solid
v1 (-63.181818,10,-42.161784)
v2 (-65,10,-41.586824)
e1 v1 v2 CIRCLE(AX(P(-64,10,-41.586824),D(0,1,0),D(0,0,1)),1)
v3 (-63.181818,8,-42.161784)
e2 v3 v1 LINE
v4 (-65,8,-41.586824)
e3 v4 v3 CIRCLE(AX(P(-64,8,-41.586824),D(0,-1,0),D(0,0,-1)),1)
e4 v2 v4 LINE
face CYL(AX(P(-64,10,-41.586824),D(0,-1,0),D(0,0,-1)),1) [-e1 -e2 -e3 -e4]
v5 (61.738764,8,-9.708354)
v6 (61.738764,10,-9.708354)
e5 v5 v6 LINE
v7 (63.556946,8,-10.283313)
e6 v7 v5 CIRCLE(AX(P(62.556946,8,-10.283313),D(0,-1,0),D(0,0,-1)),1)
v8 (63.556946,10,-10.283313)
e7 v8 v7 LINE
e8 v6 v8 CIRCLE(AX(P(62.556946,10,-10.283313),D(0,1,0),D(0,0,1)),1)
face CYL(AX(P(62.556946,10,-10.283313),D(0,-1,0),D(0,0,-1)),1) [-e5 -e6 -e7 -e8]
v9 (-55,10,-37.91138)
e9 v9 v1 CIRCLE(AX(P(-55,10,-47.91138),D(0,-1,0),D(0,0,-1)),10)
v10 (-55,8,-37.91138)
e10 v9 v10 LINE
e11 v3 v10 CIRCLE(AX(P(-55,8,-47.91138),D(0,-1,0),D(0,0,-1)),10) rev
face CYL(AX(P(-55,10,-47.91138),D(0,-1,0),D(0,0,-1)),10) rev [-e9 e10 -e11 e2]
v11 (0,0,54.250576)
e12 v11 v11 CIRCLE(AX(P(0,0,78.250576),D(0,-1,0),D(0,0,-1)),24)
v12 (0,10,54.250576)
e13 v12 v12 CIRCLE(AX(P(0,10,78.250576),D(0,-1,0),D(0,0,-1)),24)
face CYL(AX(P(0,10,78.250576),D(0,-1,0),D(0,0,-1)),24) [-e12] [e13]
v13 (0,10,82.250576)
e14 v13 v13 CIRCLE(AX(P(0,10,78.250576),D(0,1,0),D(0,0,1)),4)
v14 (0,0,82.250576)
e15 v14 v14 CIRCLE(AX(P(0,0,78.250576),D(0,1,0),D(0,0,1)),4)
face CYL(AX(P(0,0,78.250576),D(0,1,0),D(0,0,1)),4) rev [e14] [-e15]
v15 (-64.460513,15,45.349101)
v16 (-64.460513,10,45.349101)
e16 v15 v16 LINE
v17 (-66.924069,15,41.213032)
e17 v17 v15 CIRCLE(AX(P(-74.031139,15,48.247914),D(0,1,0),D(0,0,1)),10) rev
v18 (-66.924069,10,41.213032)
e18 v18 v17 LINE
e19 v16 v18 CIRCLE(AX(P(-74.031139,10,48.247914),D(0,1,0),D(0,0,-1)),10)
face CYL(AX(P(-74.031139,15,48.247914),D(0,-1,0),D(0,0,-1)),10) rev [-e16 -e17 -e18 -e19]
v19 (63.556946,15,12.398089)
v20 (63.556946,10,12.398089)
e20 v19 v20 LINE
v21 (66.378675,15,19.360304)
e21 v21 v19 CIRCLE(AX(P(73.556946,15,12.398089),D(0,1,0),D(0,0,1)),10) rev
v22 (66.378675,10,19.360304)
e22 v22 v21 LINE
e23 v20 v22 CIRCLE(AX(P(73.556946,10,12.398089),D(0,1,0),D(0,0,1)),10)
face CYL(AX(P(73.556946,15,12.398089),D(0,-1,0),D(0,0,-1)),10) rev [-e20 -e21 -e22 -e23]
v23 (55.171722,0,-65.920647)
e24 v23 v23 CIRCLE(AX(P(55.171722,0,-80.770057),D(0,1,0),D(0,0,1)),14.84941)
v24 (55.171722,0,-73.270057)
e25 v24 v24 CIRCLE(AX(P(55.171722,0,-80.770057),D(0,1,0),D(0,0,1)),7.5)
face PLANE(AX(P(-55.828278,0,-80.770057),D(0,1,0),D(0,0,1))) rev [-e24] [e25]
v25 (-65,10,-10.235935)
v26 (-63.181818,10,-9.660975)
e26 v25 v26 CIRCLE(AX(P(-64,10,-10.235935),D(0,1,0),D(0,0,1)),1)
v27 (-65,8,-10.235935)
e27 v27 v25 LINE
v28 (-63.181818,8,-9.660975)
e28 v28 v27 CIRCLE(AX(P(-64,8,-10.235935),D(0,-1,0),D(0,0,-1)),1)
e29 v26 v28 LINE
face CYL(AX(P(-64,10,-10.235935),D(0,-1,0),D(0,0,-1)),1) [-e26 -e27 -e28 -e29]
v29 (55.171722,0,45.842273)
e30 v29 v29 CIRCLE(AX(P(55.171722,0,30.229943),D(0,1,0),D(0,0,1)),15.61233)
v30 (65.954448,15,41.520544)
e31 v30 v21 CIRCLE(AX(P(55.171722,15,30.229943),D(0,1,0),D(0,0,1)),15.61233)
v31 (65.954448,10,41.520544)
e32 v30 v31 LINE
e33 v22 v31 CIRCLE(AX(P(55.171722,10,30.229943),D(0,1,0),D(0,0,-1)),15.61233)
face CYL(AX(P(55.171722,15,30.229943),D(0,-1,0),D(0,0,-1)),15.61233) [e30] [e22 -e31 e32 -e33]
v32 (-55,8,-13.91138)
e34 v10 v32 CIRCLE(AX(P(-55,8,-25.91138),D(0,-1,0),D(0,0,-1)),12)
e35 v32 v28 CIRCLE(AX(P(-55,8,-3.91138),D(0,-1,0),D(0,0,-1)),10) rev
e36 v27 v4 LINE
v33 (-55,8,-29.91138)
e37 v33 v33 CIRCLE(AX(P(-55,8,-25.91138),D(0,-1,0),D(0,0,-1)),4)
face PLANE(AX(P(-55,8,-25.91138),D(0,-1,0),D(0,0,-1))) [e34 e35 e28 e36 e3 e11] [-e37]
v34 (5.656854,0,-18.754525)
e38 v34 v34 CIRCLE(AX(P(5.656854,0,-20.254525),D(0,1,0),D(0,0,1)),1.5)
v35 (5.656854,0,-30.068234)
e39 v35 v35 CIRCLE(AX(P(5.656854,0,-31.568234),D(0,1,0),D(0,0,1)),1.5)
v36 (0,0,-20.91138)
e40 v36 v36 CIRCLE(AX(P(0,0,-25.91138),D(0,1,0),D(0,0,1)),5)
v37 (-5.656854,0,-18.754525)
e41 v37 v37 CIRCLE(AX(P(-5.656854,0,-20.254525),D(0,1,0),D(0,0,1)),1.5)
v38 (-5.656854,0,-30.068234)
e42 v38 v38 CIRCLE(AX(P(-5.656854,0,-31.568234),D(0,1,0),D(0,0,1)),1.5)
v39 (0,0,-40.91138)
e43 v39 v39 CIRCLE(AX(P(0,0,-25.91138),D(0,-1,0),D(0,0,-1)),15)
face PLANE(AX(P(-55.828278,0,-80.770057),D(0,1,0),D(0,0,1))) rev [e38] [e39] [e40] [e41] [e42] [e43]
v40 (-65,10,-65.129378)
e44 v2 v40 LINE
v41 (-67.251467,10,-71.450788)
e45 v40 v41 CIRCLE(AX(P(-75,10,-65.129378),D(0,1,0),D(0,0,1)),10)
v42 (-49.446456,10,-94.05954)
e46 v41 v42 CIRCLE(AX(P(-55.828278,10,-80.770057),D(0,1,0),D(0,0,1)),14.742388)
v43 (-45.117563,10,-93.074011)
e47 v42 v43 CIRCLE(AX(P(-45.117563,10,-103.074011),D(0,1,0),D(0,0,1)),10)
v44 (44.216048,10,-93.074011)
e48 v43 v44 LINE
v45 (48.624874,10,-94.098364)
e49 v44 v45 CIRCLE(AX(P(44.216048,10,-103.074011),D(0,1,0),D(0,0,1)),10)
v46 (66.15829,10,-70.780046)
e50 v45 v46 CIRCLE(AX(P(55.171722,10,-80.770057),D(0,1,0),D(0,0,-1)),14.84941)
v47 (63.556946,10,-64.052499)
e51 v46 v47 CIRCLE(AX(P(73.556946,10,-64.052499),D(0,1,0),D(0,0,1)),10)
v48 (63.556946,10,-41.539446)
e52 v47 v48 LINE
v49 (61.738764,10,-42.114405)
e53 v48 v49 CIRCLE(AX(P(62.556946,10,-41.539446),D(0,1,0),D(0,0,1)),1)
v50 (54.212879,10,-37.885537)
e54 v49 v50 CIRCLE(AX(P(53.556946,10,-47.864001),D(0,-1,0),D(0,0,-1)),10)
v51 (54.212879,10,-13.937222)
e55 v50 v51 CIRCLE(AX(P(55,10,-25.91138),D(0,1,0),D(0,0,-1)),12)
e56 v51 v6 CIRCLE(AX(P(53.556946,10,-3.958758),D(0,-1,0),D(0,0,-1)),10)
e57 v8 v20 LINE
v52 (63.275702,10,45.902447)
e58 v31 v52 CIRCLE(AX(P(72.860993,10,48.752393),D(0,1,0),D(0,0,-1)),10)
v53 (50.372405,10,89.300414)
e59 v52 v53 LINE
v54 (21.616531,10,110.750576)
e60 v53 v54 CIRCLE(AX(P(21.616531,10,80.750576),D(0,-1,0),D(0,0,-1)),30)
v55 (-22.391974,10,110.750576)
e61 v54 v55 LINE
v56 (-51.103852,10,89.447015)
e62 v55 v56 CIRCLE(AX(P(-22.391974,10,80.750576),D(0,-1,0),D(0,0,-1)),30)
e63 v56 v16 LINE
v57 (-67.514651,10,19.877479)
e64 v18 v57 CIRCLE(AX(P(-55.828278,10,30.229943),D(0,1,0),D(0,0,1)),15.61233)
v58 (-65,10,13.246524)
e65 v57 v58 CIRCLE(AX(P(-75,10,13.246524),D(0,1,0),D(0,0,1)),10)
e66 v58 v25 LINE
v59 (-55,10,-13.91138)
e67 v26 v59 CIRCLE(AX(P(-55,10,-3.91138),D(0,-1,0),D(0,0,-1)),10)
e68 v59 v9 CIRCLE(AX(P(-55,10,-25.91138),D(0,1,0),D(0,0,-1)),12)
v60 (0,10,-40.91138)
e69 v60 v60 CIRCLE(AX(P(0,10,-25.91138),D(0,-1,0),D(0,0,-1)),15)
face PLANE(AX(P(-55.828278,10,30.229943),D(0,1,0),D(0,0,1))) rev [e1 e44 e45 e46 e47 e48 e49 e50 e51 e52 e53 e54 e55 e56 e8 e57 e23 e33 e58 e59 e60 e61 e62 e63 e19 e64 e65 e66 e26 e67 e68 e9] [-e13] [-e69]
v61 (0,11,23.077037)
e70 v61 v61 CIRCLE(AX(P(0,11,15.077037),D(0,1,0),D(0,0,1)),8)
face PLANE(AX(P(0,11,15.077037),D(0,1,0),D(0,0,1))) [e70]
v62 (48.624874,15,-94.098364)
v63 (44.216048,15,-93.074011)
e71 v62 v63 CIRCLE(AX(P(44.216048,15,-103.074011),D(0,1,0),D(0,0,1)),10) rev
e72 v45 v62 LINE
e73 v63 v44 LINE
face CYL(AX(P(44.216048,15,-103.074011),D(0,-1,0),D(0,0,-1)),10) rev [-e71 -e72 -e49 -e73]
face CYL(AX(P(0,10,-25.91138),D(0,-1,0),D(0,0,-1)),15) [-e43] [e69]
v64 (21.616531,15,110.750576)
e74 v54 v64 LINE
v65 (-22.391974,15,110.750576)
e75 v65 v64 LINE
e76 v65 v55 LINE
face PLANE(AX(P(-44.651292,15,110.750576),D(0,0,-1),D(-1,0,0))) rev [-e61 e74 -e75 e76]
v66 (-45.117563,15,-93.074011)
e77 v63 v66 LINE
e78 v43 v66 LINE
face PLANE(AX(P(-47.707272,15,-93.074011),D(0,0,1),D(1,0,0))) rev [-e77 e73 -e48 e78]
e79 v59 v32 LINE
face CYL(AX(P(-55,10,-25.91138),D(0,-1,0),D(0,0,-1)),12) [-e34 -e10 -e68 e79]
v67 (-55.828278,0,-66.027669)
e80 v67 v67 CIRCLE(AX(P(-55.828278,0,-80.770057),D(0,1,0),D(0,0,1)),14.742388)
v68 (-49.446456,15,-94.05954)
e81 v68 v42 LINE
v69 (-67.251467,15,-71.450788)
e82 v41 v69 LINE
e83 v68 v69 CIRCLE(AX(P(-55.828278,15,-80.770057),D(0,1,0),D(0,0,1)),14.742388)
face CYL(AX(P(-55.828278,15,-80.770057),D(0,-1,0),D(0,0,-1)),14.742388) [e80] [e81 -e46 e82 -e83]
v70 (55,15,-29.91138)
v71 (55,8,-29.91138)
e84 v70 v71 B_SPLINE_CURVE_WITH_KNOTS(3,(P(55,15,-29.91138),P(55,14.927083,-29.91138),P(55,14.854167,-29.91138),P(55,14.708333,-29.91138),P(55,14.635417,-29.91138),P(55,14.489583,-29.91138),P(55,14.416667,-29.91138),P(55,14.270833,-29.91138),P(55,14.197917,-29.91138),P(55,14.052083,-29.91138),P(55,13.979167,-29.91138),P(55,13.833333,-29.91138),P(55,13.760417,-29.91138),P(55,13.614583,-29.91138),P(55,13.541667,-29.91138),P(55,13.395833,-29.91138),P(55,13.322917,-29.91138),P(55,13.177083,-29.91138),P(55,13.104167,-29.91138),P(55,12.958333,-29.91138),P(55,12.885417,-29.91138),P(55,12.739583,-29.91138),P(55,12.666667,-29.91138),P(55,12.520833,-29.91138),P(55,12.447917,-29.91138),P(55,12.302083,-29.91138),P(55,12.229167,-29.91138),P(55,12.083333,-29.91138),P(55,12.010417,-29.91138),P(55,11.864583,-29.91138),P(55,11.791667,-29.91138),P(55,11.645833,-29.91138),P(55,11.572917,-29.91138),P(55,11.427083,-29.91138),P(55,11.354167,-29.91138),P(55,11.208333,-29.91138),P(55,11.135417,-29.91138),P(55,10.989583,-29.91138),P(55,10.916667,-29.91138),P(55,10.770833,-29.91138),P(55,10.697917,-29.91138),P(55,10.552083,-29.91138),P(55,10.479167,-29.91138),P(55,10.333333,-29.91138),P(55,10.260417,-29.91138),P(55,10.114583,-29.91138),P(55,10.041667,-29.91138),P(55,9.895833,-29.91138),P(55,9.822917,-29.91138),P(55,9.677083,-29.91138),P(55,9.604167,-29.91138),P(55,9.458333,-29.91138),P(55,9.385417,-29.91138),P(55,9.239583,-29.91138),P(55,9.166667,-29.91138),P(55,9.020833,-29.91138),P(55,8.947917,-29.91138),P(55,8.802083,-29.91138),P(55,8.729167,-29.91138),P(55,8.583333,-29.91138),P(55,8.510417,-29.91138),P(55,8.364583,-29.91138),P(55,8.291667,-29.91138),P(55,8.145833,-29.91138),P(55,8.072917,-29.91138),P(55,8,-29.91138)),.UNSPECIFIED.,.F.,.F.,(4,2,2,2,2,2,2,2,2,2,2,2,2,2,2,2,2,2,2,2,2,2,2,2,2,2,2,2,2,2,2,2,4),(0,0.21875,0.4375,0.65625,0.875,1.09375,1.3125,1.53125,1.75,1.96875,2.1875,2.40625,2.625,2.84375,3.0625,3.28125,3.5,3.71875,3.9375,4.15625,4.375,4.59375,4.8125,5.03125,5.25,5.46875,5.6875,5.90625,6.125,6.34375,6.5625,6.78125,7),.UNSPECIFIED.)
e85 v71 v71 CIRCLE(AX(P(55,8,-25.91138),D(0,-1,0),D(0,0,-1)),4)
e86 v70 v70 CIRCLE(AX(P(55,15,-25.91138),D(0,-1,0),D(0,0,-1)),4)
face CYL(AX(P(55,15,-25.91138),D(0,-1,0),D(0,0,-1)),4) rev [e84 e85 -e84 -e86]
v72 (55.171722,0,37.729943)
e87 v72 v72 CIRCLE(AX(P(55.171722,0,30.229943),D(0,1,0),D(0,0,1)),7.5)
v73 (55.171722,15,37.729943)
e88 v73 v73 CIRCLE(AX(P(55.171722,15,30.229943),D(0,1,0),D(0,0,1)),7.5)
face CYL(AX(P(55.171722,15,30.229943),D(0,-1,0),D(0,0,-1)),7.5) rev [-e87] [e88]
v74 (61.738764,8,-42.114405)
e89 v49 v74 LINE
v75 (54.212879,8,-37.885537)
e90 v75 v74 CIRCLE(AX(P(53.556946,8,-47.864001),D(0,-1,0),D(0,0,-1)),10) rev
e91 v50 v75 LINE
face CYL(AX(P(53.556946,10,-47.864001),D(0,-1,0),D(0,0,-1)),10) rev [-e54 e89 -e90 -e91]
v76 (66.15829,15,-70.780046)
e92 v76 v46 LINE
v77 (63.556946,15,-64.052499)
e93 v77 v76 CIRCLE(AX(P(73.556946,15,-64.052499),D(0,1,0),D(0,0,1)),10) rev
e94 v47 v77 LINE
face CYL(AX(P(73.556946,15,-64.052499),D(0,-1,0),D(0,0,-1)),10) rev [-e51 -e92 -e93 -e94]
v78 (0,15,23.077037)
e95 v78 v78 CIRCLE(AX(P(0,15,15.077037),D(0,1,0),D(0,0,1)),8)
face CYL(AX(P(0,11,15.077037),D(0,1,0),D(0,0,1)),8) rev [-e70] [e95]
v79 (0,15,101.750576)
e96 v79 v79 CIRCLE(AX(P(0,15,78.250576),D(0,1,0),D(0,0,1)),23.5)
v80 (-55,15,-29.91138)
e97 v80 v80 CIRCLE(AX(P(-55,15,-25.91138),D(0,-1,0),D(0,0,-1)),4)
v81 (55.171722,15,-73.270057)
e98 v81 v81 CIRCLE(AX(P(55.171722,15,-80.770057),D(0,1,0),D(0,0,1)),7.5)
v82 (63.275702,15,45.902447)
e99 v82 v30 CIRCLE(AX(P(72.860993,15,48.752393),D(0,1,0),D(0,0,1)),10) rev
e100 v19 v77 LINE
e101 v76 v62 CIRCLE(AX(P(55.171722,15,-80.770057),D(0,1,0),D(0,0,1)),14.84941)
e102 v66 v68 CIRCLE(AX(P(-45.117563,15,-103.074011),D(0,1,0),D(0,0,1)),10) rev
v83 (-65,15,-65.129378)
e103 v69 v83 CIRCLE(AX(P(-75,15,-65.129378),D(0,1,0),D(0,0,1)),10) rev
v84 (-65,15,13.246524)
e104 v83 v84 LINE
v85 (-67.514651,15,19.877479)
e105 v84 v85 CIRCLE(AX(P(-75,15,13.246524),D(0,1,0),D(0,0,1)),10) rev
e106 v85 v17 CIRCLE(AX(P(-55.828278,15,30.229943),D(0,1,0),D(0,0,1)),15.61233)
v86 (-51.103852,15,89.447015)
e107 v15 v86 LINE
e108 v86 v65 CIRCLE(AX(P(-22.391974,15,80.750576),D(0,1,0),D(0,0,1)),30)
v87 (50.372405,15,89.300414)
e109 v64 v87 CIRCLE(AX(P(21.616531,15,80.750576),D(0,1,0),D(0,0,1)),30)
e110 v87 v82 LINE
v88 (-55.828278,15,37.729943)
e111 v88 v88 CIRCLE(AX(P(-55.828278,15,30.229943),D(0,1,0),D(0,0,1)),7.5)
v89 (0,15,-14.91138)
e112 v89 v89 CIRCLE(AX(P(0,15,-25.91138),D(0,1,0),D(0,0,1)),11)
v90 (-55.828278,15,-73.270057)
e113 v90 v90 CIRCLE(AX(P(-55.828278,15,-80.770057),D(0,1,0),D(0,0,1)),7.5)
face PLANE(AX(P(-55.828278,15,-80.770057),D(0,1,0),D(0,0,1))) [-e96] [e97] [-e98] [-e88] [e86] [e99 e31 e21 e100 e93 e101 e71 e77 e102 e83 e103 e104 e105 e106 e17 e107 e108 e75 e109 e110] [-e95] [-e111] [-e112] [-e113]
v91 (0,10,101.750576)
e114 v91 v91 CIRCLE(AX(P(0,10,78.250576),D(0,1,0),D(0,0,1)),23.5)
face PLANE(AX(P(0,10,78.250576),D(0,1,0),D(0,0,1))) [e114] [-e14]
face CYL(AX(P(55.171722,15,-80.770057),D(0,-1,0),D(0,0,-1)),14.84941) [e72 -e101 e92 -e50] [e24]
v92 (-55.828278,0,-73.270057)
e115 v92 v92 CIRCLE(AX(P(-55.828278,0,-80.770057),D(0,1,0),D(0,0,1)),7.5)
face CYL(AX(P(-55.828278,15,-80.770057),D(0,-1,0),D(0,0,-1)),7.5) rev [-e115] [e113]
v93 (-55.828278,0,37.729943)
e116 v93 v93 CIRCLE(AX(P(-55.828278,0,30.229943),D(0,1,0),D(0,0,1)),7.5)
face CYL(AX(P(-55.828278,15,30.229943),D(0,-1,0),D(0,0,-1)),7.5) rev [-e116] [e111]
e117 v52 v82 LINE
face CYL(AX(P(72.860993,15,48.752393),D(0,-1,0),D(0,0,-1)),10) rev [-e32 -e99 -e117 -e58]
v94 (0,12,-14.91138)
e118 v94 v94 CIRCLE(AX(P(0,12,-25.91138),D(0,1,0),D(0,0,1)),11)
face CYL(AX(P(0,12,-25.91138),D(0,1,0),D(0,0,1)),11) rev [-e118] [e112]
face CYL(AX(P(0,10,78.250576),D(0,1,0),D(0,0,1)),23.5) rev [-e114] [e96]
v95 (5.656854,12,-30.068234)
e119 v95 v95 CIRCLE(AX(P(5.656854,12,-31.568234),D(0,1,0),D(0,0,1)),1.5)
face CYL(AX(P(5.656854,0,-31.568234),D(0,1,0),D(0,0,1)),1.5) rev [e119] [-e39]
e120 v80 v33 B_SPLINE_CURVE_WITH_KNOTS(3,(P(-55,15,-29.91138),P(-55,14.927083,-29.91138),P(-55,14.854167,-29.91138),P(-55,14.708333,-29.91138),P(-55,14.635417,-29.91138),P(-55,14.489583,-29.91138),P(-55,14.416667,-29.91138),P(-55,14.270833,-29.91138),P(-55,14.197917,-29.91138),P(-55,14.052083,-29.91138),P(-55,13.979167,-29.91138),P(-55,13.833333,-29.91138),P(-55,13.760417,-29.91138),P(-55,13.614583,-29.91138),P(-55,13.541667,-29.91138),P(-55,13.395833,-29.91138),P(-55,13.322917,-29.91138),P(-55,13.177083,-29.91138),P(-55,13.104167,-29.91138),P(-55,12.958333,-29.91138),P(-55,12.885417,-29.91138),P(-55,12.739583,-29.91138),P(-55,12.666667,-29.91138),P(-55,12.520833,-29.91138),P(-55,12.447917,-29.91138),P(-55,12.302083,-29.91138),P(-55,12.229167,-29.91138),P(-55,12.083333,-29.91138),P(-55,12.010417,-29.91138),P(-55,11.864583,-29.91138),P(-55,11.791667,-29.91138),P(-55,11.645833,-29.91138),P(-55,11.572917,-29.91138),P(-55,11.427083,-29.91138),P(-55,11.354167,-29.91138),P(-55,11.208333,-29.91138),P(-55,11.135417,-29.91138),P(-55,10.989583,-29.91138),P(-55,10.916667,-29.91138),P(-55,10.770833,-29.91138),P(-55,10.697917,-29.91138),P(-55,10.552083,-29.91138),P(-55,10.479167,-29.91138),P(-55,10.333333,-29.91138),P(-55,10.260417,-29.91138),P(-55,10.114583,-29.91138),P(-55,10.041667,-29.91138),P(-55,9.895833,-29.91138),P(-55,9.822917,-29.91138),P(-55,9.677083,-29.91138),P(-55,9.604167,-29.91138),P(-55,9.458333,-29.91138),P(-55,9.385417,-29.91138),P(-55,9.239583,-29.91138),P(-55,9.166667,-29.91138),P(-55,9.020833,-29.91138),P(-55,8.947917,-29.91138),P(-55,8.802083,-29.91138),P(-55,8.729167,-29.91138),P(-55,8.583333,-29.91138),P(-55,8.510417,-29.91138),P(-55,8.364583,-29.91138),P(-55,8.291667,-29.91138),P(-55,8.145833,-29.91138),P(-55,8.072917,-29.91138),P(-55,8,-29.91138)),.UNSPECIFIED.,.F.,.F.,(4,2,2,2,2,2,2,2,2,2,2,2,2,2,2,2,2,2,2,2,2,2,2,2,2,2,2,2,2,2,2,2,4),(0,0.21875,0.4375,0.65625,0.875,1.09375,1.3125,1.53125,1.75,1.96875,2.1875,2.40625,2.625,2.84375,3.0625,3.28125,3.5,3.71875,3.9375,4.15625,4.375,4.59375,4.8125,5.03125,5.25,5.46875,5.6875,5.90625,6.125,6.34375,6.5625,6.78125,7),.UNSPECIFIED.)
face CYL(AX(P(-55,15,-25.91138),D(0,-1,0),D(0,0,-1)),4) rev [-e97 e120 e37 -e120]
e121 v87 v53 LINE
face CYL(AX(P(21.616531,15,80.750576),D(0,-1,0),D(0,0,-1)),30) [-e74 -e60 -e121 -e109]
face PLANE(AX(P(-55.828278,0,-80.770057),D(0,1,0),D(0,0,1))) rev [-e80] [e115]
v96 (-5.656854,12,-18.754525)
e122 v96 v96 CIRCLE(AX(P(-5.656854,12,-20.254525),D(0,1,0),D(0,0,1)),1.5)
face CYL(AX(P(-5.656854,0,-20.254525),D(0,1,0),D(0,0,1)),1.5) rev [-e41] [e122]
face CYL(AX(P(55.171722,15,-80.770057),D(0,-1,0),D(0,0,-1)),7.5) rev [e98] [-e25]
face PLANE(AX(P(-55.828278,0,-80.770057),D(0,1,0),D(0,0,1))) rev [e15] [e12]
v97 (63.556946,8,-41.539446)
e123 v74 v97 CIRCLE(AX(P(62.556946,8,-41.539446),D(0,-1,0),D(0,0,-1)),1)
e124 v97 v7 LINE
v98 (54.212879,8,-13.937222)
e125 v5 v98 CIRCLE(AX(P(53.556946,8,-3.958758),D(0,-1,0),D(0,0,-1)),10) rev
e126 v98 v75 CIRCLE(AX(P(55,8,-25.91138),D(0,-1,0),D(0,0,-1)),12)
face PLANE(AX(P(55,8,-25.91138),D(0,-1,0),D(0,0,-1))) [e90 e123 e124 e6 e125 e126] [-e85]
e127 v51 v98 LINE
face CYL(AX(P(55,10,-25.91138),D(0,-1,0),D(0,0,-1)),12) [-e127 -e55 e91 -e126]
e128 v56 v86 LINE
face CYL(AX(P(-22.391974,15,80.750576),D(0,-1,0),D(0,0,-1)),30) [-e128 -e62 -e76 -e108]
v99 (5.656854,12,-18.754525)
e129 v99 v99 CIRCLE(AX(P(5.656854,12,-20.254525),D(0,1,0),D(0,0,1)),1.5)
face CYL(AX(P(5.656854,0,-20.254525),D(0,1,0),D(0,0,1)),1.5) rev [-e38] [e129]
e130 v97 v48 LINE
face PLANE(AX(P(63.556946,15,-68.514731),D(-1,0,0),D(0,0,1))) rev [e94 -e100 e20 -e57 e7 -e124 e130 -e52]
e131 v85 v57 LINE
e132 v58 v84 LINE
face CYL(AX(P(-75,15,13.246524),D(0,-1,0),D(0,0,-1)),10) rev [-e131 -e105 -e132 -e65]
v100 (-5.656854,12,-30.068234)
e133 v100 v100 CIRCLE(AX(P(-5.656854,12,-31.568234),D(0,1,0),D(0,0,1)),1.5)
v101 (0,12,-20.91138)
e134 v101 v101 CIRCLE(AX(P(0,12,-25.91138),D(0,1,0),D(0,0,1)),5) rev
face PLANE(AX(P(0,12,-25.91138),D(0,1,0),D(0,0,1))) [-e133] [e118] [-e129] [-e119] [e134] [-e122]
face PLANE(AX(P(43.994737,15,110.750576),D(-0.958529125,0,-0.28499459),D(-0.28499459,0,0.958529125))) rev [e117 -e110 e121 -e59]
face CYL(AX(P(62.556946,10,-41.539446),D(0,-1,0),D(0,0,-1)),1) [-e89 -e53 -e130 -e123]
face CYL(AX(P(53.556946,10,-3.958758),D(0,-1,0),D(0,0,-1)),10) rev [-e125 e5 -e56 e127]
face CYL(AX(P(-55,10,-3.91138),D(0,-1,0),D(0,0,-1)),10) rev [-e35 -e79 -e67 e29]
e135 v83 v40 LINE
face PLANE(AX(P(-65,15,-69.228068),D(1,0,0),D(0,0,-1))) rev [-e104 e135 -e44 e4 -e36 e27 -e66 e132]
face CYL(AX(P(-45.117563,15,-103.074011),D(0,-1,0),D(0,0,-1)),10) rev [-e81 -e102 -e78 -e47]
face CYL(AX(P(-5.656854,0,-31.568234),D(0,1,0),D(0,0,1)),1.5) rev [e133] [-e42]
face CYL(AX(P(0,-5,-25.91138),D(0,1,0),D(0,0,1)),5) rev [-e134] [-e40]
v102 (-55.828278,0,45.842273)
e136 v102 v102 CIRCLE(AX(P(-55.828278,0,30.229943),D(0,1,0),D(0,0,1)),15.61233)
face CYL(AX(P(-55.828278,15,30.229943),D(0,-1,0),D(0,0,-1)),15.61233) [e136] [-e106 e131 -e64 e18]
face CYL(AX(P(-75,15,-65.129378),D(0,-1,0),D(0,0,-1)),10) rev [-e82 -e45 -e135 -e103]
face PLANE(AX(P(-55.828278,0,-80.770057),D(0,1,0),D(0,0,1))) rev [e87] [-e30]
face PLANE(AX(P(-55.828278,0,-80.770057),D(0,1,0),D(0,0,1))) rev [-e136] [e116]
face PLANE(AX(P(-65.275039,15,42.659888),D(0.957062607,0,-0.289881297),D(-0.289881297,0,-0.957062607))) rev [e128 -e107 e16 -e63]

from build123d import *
from build123d.topology import SkipClean

# Parameters (mm, degrees)
SKETCH1_R           = 7.5
BOSS_EXTRUDE1_DEPTH = 15
SKETCH4_R           = 5
CUT_EXTRUDE2_DEPTH  = 20
SKETCH5_R           = 11
CUT_EXTRUDE3_DEPTH  = 3
SKETCH6_R           = 1.5
CUT_EXTRUDE4_DEPTH  = 133.338393859
SKETCH7_R           = 8
CUT_EXTRUDE5_DEPTH  = 4
FILLET3_R           = 30
FILLET4_R           = 10
SKETCH9_R           = 23.5
CUT_EXTRUDE6_DEPTH  = 5
SKETCH10_R          = 4
CUT_EXTRUDE7_DEPTH  = 133.172048819
SKETCH11_R          = 12
CUT_EXTRUDE8_DEPTH  = 8
FILLET5_R           = 10
SKETCH12_R          = 4
CUT_EXTRUDE9_DEPTH  = 133.035792455
SKETCH14_R          = 24
SKETCH14_R_2        = 15
CUT_EXTRUDE16_DEPTH = 10
FILLET6_R           = 10
FILLET7_START       = 8
FILLET7_DEPTH       = 2


with BuildPart() as part:
    # Sketch1 → Boss-Extrude1 (new body)
    with BuildSketch(Plane(origin=(0, 0, 0), x_dir=(1, 0, 0), z_dir=(0, 1, 0))):
        with BuildLine():
            Line((-47.707272336, 93.074011467), (46.85801727, 93.074011467))
            ThreePointArc((46.85801727, 93.074011467), (67.451414768, 89.11955675), (63.55694563, 68.514731035))
            Line((63.55694563, 68.514731035), (63.55694563, -17.060551097))
            ThreePointArc((63.55694563, -17.060551097), (70.78018401, -29.882416282), (64.134785378, -43.013070362))
            Line((64.134785378, -43.013070362), (43.994737315, -110.750576059))
            Line((43.994737315, -110.750576059), (-44.651292342, -110.750576059))
            Line((-44.651292342, -110.750576059), (-65.275039181, -42.659888117))
            ThreePointArc((-65.275039181, -42.659888117), (-71.439667546, -30.058632987), (-65, -17.595689691))
            Line((-65, -17.595689691), (-65, 69.228067604))
            ThreePointArc((-65, 69.228067604), (-67.7628182, 89.424810491), (-47.707272336, 93.074011467))
        make_face()
        with Locations(Location((-55.828277514, 80.770057168, 0), (0, 0, 270))):
            Circle(SKETCH1_R, mode=Mode.SUBTRACT)
        with Locations(Location((55.171722486, 80.770057168, 0), (0, 0, 270))):
            Circle(SKETCH1_R, mode=Mode.SUBTRACT)
        with Locations(Location((-55.828277514, -30.229942832, 0), (0, 0, 270))):
            Circle(SKETCH1_R, mode=Mode.SUBTRACT)
        with Locations(Location((55.171722486, -30.229942832, 0), (0, 0, 270))):
            Circle(SKETCH1_R, mode=Mode.SUBTRACT)
    extrude(amount=BOSS_EXTRUDE1_DEPTH)

    # Sketch4 → Cut-Extrude2 (cut)
    with BuildSketch(Plane(origin=(0, 15, 0), x_dir=(1, 0, 0), z_dir=(0, 1, 0))):
        with Locations(Location((0, 25.91137957, 0), (0, 0, 270))):
            Circle(SKETCH4_R)
    extrude(amount=-CUT_EXTRUDE2_DEPTH, mode=Mode.SUBTRACT)

    # Sketch5 → Cut-Extrude3 (cut)
    with BuildSketch(Plane(origin=(0, 15, 0), x_dir=(1, 0, 0), z_dir=(0, 1, 0))):
        with Locations(Location((0, 25.91137957, 0), (0, 0, 270))):
            Circle(SKETCH5_R)
    extrude(amount=-CUT_EXTRUDE3_DEPTH, mode=Mode.SUBTRACT)

    # Sketch6 → Cut-Extrude4 (cut, through all)
    with BuildSketch(Plane(origin=(0, 12, 0), x_dir=(1, 0, 0), z_dir=(0, 1, 0))):
        with Locations(Location((-5.656854249, 31.568233819, 0), (0, 0, 270))):
            Circle(SKETCH6_R)
        with Locations(Location((5.656854249, 31.568233819, 0), (0, 0, 270))):
            Circle(SKETCH6_R)
        with Locations(Location((5.656854249, 20.25452532, 0), (0, 0, 270))):
            Circle(SKETCH6_R)
        with Locations(Location((-5.656854249, 20.25452532, 0), (0, 0, 270))):
            Circle(SKETCH6_R)
    extrude(amount=-CUT_EXTRUDE4_DEPTH, mode=Mode.SUBTRACT)

    # Sketch7 → Cut-Extrude5 (cut)
    with BuildSketch(Plane(origin=(0, 15, 0), x_dir=(1, 0, 0), z_dir=(0, 1, 0))):
        with Locations(Location((0, -15.077036946, 0), (0, 0, 270))):
            Circle(SKETCH7_R)
    extrude(amount=-CUT_EXTRUDE5_DEPTH, mode=Mode.SUBTRACT)

    # Fillet3
    fillet3_edges = [part.edges().sort_by_distance(p)[0] for p in [
        (43.994737315, 7.5, 110.750576059),
        (-44.651292342, 7.5, 110.750576059),
    ]]
    fillet(fillet3_edges, radius=FILLET3_R)

    # Fillet4
    fillet4_edges = [part.edges().sort_by_distance(p)[0] for p in [
        (64.134785378, 7.5, 43.013070362),
        (-65.275039181, 7.5, 42.659888117),
    ]]
    fillet(fillet4_edges, radius=FILLET4_R)

    # Sketch9 → Cut-Extrude6 (cut)
    with BuildSketch(Plane(origin=(0, 15, 0), x_dir=(1, 0, 0), z_dir=(0, 1, 0))):
        with Locations(Location((0, -78.250576059, 0), (0, 0, 270))):
            Circle(SKETCH9_R)
    extrude(amount=-CUT_EXTRUDE6_DEPTH, mode=Mode.SUBTRACT)

    # Sketch10 → Cut-Extrude7 (cut, through all)
    with BuildSketch(Plane(origin=(0, 10, 0), x_dir=(1, 0, 0), z_dir=(0, 1, 0))):
        with Locations(Location((0, -78.250576059, 0), (0, 0, 270))):
            Circle(SKETCH10_R)
    extrude(amount=-CUT_EXTRUDE7_DEPTH, mode=Mode.SUBTRACT)

    # Sketch11 → Cut-Extrude8 (cut)
    with BuildSketch(Plane.XZ):
        with Locations((-55, -25.91137957)):
            Circle(SKETCH11_R)
        with Locations((55, -25.91137957)):
            Circle(SKETCH11_R)
    extrude(amount=-CUT_EXTRUDE8_DEPTH, mode=Mode.SUBTRACT)

    # Fillet5
    fillet5_edges = [part.edges().sort_by_distance(p)[0] for p in [
        (63.55694563, 4, -17.498372885),
        (63.55694563, 4, -34.324386255),
        (-65, 4, -32.544629151),
        (-65, 4, -19.278129989),
    ]]
    fillet(fillet5_edges, radius=FILLET5_R)

    # Sketch12 → Cut-Extrude9 (cut, through all)
    with BuildSketch(Plane.XZ.offset(-8)):
        with Locations(Location((-55, -25.91137957, 0), (0, 0, 270))):
            Circle(SKETCH12_R)
        with Locations(Location((55, -25.91137957, 0), (0, 0, 270))):
            Circle(SKETCH12_R)
    extrude(amount=-CUT_EXTRUDE9_DEPTH, mode=Mode.SUBTRACT)

    # Sketch14 → Cut-Extrude16 (cut)
    with SkipClean():  # the faces are left unmerged after this step: merging them gives an invalid solid
        with BuildSketch(Plane.XZ):
            with BuildLine():
                Line((63.55694563, -3.958757993), (63.55694563, 17.060551097))
                ThreePointArc((63.55694563, 17.060551097), (39.633853338, 31.752922858), (65.954448155, 41.520543922))
                ThreePointArc((65.954448155, 41.520543922), (64.328969033, 43.536593055), (63.275701742, 45.902446917))
                Line((63.275701742, 45.902446917), (50.37240498, 89.300413753))
                ThreePointArc((50.37240498, 89.300413753), (39.553990203, 104.79735475), (21.616531225, 110.750576059))
                Line((21.616531225, 110.750576059), (-22.391974152, 110.750576059))
                ThreePointArc((-22.391974152, 110.750576059), (-40.268031225, 104.843035119), (-51.103852363, 89.447014961))
                Line((-51.103852363, 89.447014961), (-64.46051315, 45.349100617))
                ThreePointArc((-64.46051315, 45.349100617), (-65.439681201, 43.13060481), (-66.9240694, 41.213032024))
                ThreePointArc((-66.9240694, 41.213032024), (-40.267501523, 31.497655875), (-65, 17.595689691))
                Line((-65, 17.595689691), (-65, -3.91137957))
                ThreePointArc((-65, -3.91137957), (-62.071067812, -10.982447382), (-55, -13.91137957))
                ThreePointArc((-55, -13.91137957), (-43, -25.91137957), (-55, -37.91137957))
                ThreePointArc((-55, -37.91137957), (-62.071067812, -40.840311758), (-65, -47.91137957))
                Line((-65, -47.91137957), (-65, -69.228067604))
                ThreePointArc((-65, -69.228067604), (-43.893736828, -72.115303846), (-47.707272336, -93.074011467))
                Line((-47.707272336, -93.074011467), (46.85801727, -93.074011467))
                ThreePointArc((46.85801727, -93.074011467), (42.892030205, -72.420557586), (63.55694563, -68.514731035))
                Line((63.55694563, -68.514731035), (63.55694563, -47.864001147))
                ThreePointArc((63.55694563, -47.864001147), (60.856237995, -41.028773939), (54.212879435, -37.885536794))
                ThreePointArc((54.212879435, -37.885536794), (43, -25.91137957), (54.212879435, -13.937222346))
                ThreePointArc((54.212879435, -13.937222346), (60.856237995, -10.793985201), (63.55694563, -3.958757993))
            make_face()
            with Locations(Location((0, 78.250576059, 0), (0, 0, 270))):
                Circle(SKETCH14_R, mode=Mode.SUBTRACT)
            with Locations(Location((0, -25.91137957, 0), (0, 0, 270))):
                Circle(SKETCH14_R_2, mode=Mode.SUBTRACT)
        extrude(amount=-CUT_EXTRUDE16_DEPTH, mode=Mode.SUBTRACT)

    # Fillet6
    fillet6_edges = [part.edges().sort_by_distance(p)[0] for p in [
        (-47.707272336, 12.5, -93.074011467),
        (46.85801727, 12.5, -93.074011467),
        (63.55694563, 12.5, -68.514731035),
        (63.55694563, 12.5, 17.060551097),
        (-65, 12.5, 17.595689691),
        (-65, 12.5, -69.228067604),
    ]]
    fillet(fillet6_edges, radius=FILLET6_R)

    # Fillet7: read off the stored shape, not the designer's step
    # Fillet7 outline → Fillet7 (cut)
    with SkipClean():  # the faces are left unmerged after this step: merging them gives an invalid solid
        with BuildSketch(Plane(origin=(0, 0, 0), x_dir=(1, 0, 0), z_dir=(0, 1, 0)).offset(FILLET7_START)):
            with BuildLine():
                ThreePointArc((-65, 3.91137957), (-64.534625893, 6.926493016), (-63.181818182, 9.660975316))
                ThreePointArc((-63.181818182, 9.660975316), (-64.301511345, 9.282472301), (-65, 10.23593489))
                Line((-65, 10.23593489), (-65, 3.91137957))
            make_face()
            with BuildLine():
                Line((-65, 47.91137957), (-65, 41.58682425))
                ThreePointArc((-65, 41.58682425), (-64.301511345, 42.540286839), (-63.181818182, 42.161783824))
                ThreePointArc((-63.181818182, 42.161783824), (-64.534625893, 44.896266124), (-65, 47.91137957))
            make_face()
            with BuildLine():
                ThreePointArc((63.55694563, 47.864001147), (63.091571523, 44.848887701), (61.738763812, 42.114405401))
                ThreePointArc((61.738763812, 42.114405401), (62.858456975, 42.492908415), (63.55694563, 41.539445826))
                Line((63.55694563, 41.539445826), (63.55694563, 47.864001147))
            make_face()
            with BuildLine():
                Line((63.55694563, 3.958757993), (63.55694563, 10.283313314))
                ThreePointArc((63.55694563, 10.283313314), (62.858456975, 9.329850724), (61.738763812, 9.708353739))
                ThreePointArc((61.738763812, 9.708353739), (63.091571523, 6.973871439), (63.55694563, 3.958757993))
            make_face()
        extrude(amount=FILLET7_DEPTH, mode=Mode.SUBTRACT)


solid = part.part
